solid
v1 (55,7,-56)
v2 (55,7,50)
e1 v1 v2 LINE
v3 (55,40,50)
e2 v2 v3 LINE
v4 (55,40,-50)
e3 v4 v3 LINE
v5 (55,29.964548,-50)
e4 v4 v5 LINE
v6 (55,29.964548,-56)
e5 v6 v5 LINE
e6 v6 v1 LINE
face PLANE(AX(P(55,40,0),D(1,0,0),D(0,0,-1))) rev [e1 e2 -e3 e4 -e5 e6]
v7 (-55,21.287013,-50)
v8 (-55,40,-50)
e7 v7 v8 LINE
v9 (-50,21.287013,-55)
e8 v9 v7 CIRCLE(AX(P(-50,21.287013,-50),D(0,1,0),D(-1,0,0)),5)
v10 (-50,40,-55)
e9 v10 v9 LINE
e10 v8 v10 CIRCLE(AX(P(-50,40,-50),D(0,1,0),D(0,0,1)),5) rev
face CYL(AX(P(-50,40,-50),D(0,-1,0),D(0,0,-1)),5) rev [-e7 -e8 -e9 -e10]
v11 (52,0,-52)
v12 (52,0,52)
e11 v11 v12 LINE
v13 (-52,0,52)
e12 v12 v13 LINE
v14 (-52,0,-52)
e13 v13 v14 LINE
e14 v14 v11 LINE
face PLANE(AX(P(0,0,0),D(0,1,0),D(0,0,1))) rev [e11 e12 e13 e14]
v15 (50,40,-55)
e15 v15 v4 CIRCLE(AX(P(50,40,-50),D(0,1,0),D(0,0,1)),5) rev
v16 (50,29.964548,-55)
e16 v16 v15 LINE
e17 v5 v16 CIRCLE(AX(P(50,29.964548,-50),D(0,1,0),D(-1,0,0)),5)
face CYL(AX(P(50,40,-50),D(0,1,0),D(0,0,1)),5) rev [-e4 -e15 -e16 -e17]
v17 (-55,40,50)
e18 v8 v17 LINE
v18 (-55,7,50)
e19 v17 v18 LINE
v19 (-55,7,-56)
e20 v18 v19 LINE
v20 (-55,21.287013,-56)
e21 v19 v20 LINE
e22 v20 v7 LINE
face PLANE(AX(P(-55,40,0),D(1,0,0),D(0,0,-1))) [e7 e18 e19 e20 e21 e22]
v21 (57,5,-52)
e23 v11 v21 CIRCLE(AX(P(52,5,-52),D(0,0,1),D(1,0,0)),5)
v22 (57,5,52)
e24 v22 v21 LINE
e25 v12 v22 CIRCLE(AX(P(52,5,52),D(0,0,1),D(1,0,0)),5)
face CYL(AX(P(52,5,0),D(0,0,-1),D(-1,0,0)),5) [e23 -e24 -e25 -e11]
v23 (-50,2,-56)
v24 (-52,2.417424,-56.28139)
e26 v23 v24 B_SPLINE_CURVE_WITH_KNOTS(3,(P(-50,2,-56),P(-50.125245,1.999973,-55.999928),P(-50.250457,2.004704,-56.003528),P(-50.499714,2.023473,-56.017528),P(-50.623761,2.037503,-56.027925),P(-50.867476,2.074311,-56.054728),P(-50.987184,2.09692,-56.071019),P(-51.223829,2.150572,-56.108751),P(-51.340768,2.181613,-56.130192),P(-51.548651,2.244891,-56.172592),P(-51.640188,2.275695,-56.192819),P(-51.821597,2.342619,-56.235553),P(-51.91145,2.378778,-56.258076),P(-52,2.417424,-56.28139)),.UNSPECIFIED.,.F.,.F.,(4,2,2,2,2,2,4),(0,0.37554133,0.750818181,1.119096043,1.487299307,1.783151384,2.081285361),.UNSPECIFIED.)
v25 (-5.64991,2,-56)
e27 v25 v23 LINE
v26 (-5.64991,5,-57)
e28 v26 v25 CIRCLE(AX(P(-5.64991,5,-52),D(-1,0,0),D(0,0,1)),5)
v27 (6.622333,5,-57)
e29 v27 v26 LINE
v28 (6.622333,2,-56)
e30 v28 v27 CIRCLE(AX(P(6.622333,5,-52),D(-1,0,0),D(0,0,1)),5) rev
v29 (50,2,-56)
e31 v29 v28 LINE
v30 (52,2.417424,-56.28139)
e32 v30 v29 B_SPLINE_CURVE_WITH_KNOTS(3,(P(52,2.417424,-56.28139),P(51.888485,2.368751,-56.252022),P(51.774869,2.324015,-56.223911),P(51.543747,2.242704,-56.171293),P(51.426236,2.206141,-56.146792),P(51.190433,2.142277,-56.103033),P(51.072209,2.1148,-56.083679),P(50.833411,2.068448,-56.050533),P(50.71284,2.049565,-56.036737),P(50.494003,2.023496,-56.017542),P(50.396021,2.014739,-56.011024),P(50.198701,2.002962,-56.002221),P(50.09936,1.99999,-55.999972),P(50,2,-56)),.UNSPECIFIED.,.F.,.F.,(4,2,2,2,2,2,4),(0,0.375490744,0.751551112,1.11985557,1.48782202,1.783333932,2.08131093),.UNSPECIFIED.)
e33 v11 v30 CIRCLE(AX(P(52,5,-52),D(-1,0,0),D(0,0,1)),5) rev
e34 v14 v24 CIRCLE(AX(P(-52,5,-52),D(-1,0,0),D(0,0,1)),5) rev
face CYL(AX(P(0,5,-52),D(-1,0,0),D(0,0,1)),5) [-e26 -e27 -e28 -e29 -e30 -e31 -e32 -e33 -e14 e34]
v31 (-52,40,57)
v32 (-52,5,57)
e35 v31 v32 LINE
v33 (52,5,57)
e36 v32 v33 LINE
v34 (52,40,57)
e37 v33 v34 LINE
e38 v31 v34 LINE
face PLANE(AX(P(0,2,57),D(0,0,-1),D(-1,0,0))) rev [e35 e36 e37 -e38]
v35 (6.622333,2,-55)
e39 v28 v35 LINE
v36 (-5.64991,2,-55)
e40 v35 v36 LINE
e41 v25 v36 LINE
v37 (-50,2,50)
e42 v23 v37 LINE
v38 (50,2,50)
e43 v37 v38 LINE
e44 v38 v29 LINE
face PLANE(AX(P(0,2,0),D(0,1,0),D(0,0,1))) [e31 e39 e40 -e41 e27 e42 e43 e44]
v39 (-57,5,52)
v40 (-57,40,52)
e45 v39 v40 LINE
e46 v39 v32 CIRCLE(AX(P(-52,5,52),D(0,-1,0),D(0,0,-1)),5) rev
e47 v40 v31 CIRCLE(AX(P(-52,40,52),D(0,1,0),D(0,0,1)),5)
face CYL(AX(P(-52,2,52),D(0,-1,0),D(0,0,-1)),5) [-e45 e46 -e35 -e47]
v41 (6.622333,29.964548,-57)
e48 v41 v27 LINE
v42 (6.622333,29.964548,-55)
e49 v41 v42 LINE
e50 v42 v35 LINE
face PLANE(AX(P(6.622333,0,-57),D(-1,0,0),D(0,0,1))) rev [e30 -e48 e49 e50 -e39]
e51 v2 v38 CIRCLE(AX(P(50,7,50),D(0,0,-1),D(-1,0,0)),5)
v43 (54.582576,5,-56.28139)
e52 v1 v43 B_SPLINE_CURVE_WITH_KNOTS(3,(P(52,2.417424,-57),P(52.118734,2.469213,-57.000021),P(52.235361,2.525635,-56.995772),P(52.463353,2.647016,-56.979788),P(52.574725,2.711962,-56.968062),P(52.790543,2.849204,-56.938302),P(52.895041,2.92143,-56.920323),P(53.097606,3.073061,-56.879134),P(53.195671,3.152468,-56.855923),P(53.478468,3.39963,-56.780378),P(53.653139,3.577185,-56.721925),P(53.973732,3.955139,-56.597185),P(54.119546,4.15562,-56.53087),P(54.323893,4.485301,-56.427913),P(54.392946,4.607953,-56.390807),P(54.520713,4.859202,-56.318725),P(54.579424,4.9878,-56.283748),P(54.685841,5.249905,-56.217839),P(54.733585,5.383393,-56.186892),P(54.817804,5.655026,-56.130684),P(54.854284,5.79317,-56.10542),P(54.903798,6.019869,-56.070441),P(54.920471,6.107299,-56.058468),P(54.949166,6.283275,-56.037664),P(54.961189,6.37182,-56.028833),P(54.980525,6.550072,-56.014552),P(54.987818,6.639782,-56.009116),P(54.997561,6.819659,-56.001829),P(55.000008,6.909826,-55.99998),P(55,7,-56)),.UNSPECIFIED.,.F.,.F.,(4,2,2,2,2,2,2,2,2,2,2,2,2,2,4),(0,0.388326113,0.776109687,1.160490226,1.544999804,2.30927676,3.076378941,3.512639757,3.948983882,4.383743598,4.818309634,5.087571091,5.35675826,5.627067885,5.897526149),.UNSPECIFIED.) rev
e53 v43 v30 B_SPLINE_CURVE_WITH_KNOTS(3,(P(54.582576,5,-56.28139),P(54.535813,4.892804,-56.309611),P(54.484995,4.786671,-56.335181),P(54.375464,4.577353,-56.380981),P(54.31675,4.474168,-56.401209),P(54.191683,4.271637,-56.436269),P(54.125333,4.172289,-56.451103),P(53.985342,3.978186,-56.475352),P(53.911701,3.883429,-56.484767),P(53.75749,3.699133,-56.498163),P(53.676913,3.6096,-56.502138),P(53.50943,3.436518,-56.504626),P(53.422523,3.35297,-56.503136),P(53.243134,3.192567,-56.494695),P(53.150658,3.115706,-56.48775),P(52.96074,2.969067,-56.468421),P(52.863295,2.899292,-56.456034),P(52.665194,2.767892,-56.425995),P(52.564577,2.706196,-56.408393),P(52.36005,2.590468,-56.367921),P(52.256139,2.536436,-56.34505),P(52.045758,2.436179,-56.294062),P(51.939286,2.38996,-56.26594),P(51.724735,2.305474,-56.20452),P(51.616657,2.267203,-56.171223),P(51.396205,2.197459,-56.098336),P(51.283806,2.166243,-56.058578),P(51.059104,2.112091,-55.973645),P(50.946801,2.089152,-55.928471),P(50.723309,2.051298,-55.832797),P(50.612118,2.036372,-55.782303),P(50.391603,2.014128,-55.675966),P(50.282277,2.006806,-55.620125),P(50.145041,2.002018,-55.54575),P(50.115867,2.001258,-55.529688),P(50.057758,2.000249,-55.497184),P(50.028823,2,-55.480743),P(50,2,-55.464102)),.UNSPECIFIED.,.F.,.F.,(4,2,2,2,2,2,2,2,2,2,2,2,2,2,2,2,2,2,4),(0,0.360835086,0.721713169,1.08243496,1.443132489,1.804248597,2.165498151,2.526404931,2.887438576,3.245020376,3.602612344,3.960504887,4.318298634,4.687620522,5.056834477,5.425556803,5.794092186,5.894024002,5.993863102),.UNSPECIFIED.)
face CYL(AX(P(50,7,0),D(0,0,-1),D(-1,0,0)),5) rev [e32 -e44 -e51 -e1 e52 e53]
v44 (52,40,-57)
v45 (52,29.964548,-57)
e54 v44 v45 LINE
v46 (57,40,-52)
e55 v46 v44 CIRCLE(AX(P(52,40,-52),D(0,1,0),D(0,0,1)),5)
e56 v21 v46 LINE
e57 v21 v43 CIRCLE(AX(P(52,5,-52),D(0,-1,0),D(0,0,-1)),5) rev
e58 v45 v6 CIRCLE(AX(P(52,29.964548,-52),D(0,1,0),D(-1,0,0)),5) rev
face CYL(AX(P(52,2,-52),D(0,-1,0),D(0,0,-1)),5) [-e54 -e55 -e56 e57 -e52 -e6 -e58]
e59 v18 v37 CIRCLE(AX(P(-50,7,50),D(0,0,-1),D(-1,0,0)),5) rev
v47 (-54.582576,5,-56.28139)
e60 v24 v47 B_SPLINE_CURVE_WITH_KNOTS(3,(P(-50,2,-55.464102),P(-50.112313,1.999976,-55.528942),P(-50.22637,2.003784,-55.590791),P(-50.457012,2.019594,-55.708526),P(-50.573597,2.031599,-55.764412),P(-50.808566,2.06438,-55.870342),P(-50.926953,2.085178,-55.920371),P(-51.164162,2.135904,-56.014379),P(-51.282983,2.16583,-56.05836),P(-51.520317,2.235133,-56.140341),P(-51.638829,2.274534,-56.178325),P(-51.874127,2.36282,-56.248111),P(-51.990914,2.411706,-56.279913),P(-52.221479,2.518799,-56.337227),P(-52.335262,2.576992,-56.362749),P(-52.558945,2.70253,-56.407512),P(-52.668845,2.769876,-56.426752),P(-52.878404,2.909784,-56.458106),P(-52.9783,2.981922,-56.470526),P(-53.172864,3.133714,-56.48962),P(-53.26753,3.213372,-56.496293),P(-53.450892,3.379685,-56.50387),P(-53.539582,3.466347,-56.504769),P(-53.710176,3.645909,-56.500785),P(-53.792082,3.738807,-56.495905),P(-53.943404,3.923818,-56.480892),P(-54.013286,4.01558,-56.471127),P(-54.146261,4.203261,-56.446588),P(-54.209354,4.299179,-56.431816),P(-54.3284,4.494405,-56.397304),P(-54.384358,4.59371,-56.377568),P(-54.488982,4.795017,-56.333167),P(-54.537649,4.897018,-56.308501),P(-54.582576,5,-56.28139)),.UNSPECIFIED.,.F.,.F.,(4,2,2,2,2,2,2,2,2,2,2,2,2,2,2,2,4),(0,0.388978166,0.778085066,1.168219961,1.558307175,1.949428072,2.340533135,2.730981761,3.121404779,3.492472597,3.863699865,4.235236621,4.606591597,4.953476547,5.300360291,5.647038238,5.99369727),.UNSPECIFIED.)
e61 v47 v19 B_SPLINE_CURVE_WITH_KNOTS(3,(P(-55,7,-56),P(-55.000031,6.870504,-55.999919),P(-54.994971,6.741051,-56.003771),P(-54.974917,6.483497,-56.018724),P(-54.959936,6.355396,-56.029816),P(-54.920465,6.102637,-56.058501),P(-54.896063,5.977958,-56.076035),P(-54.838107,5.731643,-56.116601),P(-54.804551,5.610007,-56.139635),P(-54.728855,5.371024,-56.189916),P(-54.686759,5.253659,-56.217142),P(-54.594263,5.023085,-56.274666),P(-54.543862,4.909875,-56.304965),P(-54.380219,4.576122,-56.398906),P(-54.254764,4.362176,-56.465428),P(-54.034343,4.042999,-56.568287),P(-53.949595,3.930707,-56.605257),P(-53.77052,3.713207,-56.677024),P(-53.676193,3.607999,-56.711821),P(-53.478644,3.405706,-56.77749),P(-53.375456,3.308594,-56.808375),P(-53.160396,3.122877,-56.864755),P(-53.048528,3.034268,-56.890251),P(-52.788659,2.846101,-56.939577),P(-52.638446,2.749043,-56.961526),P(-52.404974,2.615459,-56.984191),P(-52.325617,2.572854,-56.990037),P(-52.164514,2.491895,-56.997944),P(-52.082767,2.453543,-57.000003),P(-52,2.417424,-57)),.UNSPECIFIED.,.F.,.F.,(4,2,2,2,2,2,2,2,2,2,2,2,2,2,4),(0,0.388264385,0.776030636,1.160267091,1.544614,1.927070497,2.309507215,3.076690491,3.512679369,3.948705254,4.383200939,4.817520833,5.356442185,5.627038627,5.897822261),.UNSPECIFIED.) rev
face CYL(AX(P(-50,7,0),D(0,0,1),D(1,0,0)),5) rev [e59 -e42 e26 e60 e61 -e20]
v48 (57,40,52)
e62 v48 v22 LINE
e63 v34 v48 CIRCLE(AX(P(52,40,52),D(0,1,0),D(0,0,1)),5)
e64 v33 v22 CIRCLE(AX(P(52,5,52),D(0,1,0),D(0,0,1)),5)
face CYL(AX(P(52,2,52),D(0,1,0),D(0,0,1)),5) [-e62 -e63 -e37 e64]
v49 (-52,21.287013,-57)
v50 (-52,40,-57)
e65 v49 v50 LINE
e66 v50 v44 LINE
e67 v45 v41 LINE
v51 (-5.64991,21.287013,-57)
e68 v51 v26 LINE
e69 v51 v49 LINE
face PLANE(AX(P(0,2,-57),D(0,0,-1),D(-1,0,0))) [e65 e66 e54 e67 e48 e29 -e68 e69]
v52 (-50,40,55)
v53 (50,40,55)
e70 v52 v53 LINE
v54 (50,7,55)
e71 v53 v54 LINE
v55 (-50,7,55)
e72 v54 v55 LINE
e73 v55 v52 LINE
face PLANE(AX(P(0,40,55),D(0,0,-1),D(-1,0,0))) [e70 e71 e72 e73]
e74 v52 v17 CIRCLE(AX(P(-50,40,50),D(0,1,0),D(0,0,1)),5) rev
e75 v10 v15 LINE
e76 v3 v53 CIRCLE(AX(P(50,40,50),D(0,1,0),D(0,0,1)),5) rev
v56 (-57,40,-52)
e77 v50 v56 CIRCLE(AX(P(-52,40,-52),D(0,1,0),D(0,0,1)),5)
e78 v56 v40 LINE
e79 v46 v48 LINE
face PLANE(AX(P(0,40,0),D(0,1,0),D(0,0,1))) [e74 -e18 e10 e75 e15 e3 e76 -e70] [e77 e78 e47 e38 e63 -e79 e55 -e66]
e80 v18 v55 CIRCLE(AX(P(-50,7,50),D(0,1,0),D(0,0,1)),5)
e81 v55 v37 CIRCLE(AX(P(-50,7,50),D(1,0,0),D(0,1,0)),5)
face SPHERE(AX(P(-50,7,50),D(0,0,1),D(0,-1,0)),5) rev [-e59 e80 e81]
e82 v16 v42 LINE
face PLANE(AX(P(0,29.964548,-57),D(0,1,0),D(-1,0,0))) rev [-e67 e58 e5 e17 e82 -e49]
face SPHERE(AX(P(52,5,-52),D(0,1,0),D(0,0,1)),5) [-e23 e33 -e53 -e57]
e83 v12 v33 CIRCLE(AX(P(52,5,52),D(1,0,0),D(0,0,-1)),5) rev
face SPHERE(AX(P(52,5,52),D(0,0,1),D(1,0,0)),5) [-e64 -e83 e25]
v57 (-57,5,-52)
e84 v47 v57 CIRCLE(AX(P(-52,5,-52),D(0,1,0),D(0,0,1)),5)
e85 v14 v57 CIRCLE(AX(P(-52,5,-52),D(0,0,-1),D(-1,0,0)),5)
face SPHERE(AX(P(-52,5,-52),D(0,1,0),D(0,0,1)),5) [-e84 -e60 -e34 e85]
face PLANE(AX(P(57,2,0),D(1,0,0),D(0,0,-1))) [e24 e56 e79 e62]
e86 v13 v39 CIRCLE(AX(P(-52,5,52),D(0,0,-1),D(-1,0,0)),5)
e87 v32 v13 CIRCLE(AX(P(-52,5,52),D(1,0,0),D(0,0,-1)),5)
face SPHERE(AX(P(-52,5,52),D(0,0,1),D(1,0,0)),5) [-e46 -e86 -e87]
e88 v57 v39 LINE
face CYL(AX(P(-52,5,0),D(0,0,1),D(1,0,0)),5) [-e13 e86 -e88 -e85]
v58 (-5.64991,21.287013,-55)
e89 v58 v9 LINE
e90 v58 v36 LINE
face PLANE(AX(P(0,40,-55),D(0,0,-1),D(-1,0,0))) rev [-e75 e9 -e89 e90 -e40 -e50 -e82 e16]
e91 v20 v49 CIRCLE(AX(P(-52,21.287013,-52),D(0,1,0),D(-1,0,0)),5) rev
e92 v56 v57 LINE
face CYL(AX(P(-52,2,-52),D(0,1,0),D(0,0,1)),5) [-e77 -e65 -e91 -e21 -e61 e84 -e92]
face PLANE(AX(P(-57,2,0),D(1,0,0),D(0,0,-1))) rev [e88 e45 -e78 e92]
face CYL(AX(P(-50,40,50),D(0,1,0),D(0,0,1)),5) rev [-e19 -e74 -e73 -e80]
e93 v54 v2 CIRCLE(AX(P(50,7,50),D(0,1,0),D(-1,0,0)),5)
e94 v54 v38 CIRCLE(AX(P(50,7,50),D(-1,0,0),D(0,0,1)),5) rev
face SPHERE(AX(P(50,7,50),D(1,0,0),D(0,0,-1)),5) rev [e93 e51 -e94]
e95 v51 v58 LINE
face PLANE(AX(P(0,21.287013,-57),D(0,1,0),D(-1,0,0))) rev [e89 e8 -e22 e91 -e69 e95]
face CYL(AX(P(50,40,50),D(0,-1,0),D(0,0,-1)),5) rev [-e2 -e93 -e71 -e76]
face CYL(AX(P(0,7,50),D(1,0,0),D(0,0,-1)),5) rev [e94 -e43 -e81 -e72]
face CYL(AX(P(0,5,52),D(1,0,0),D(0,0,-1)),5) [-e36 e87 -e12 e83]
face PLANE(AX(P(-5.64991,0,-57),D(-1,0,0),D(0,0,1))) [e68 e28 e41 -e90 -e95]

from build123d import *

# Parameters (mm, degrees)
SKETCH1_W           = 114
SKETCH1_H           = 114
SKETCH1_W_2         = 110
SKETCH1_H_2         = 110
BOSS_EXTRUDE1_DEPTH = 2
SKETCH1_3_W         = 114
SKETCH1_3_H         = 114
SKETCH1_3_W_2       = 110
SKETCH1_3_H_2       = 110
BOSS_EXTRUDE2_DEPTH = 40
SKETCH2_W           = 48.37766652
SKETCH2_H           = 27.964547649
SKETCH2_W_2         = 49.350090125
SKETCH2_H_2         = 19.287013153
CUT_EXTRUDE1_DEPTH  = 132.882523482
FILLET1_R           = 5
FILLET2_R           = 5


with BuildPart() as part:
    # Sketch1 → Boss-Extrude1 (new body)
    # profile 1 of 2: a face of its own
    with BuildSketch(Plane(origin=(0, 0, 0), x_dir=(1, 0, 0), z_dir=(0, 1, 0))):
        Rectangle(SKETCH1_W, SKETCH1_H)
        Rectangle(SKETCH1_W_2, SKETCH1_H_2, mode=Mode.SUBTRACT)
    # profile 2 of 2: a face of its own
    with BuildSketch(Plane(origin=(0, 0, 0), x_dir=(1, 0, 0), z_dir=(0, 1, 0))):
        Rectangle(SKETCH1_W_2, SKETCH1_H_2)
    extrude(amount=BOSS_EXTRUDE1_DEPTH)

    # Sketch1<3> → Boss-Extrude2 (add)
    with BuildSketch(Plane(origin=(0, 0, 0), x_dir=(1, 0, 0), z_dir=(0, 1, 0))):
        Rectangle(SKETCH1_3_W, SKETCH1_3_H)
        Rectangle(SKETCH1_3_W_2, SKETCH1_3_H_2, mode=Mode.SUBTRACT)
    extrude(amount=BOSS_EXTRUDE2_DEPTH)

    # Sketch2 → Cut-Extrude1 (cut, through all)
    with BuildSketch(Plane.XY.offset(-55)):
        with Locations((30.81116674, 15.982273825)):
            Rectangle(SKETCH2_W, SKETCH2_H)
        with Locations((-30.324954937, 11.643506577)):
            Rectangle(SKETCH2_W_2, SKETCH2_H_2)
    extrude(amount=-CUT_EXTRUDE1_DEPTH, mode=Mode.SUBTRACT)

    # Fillet1
    # the kernel refuses this fillet: 5 mm, written as the material it adds along each edge
    with BuildSketch(Plane(origin=(50, 7, 50), x_dir=(0, 0, 1), z_dir=(0, -1, 0))) as fillet1_piece_1_section:
        Polygon((0, 0), (FILLET1_R, 0), (FILLET1_R, -FILLET1_R), (0, -FILLET1_R), align=None)
    fillet1_piece_1 = extrude(amount=FILLET1_R, mode=Mode.PRIVATE)
    fillet1_piece_1 = fillet1_piece_1 - Plane(origin=(50, 7, 50), x_dir=(-0.7071067811865477, 0, -0.7071067811865475), z_dir=(0, -1, 0)) * Sphere(FILLET1_R, mode=Mode.PRIVATE)
    add(fillet1_piece_1)
    with BuildSketch(Plane(origin=(-50, 7, 50), x_dir=(-1, 0, 0), z_dir=(0, -1, 0))) as fillet1_piece_2_section:
        Polygon((0, 0), (FILLET1_R, 0), (FILLET1_R, -FILLET1_R), (0, -FILLET1_R), align=None)
    fillet1_piece_2 = extrude(amount=FILLET1_R, mode=Mode.PRIVATE)
    fillet1_piece_2 = fillet1_piece_2 - Plane(origin=(-50, 7, 50), x_dir=(0.7071067811865475, 0, -0.7071067811865476), z_dir=(0, -1, 0)) * Sphere(FILLET1_R, mode=Mode.PRIVATE)
    add(fillet1_piece_2)
    with BuildSketch(Plane(origin=(55, 2, 50), x_dir=(0, 1, 0), z_dir=(0, 0, -1)), Plane(origin=(-55, 2, -57), x_dir=(0, 1, 0), z_dir=(0, 0, 1))) as fillet1_piece_3:
        with BuildLine():
            CenterArc((FILLET1_R, -FILLET1_R), FILLET1_R, 90, 90)
            Line((0, -FILLET1_R), (0, 0))
            Line((0, 0), (FILLET1_R, 0))
        make_face()
    extrude(amount=107)
    with BuildSketch(Plane(origin=(50, 2, 55), x_dir=(0, 1, 0), z_dir=(-1, 0, 0))) as fillet1_piece_4:
        with BuildLine():
            CenterArc((FILLET1_R, FILLET1_R), FILLET1_R, 180, 90)
            Line((0, FILLET1_R), (0, 0))
            Line((0, 0), (FILLET1_R, 0))
        make_face()
    extrude(amount=100)
    with BuildSketch(Plane(origin=(-55, 7, 55), x_dir=(0, 0, -1), z_dir=(0, 1, 0)), Plane(origin=(55, 7, 55), x_dir=(-1, 0, 0), z_dir=(0, 1, 0))) as fillet1_piece_5:
        with BuildLine():
            CenterArc((FILLET1_R, -FILLET1_R), FILLET1_R, 90, 90)
            Line((0, -FILLET1_R), (0, 0))
            Line((0, 0), (FILLET1_R, 0))
        make_face()
    extrude(amount=33)
    with BuildSketch(Plane(origin=(55, 29.964547649, -55), x_dir=(-1, 0, 0), z_dir=(0, 1, 0))) as fillet1_piece_6:
        with BuildLine():
            CenterArc((FILLET1_R, FILLET1_R), FILLET1_R, 180, 90)
            Line((0, FILLET1_R), (0, 0))
            Line((0, 0), (FILLET1_R, 0))
        make_face()
    extrude(amount=10.035452351)
    with BuildSketch(Plane(origin=(-55, 21.287013153, -55), x_dir=(1, 0, 0), z_dir=(0, 1, 0))) as fillet1_piece_7:
        with BuildLine():
            CenterArc((FILLET1_R, -FILLET1_R), FILLET1_R, 90, 90)
            Line((0, -FILLET1_R), (0, 0))
            Line((0, 0), (FILLET1_R, 0))
        make_face()
    extrude(amount=18.712986847)
    # the kernel refuses this fillet: 5 mm, written as the material it takes off along each edge
    with BuildSketch(Plane(origin=(69.5, 0, 57), x_dir=(0, 0, -1), z_dir=(-1, 0, 0))) as fillet1_2_piece_1:
        with BuildLine():
            CenterArc((FILLET1_R, -FILLET1_R), FILLET1_R, 90, 90)
            Line((0, -FILLET1_R), (0, 0))
            Line((0, 0), (FILLET1_R, 0))
        make_face()
    extrude(amount=139, mode=Mode.SUBTRACT)
    with BuildSketch(Plane(origin=(-57, -12.5, 57), x_dir=(1, 0, 0), z_dir=(0, 1, 0)), Plane(origin=(57, 52.5, 57), x_dir=(-1, 0, 0), z_dir=(0, -1, 0))) as fillet1_2_piece_2:
        with BuildLine():
            CenterArc((FILLET1_R, FILLET1_R), FILLET1_R, 180, 90)
            Line((0, FILLET1_R), (0, 0))
            Line((0, 0), (FILLET1_R, 0))
        make_face()
    extrude(amount=65, mode=Mode.SUBTRACT)
    with BuildSketch(Plane(origin=(57, 52.5, -57), x_dir=(-1, 0, 0), z_dir=(0, -1, 0)), Plane(origin=(-57, -12.5, -57), x_dir=(1, 0, 0), z_dir=(0, 1, 0))) as fillet1_2_piece_3:
        with BuildLine():
            CenterArc((FILLET1_R, -FILLET1_R), FILLET1_R, 90, 90)
            Line((0, -FILLET1_R), (0, 0))
            Line((0, 0), (FILLET1_R, 0))
        make_face()
    extrude(amount=65, mode=Mode.SUBTRACT)

    # Fillet2
    # the kernel refuses this fillet: 5 mm, written as the material it takes off along each edge
    with BuildSketch(Plane(origin=(52, 5, 52), x_dir=(0, -1, 0), z_dir=(1, 0, 0))) as fillet2_piece_1_section:
        Polygon((0, 0), (FILLET2_R, 0), (FILLET2_R, -FILLET2_R), (0, -FILLET2_R), align=None)
    fillet2_piece_1 = extrude(amount=FILLET2_R, mode=Mode.PRIVATE)
    fillet2_piece_1 = fillet2_piece_1 - Plane(origin=(52, 5, 52), x_dir=(0, 0.7071067811865475, -0.7071067811865475), z_dir=(1, 0, 0)) * Sphere(FILLET2_R, mode=Mode.PRIVATE)
    add(fillet2_piece_1, mode=Mode.SUBTRACT)
    with BuildSketch(Plane(origin=(-52, 5, 52), x_dir=(0, -1, 0), z_dir=(-1, 0, 0))) as fillet2_piece_2_section:
        Polygon((0, 0), (FILLET2_R, 0), (FILLET2_R, FILLET2_R), (0, FILLET2_R), align=None)
    fillet2_piece_2 = extrude(amount=FILLET2_R, mode=Mode.PRIVATE)
    fillet2_piece_2 = fillet2_piece_2 - Plane(origin=(-52, 5, 52), x_dir=(0, 0.7071067811865475, -0.7071067811865475), z_dir=(-1, 0, 0)) * Sphere(FILLET2_R, mode=Mode.PRIVATE)
    add(fillet2_piece_2, mode=Mode.SUBTRACT)
    with BuildSketch(Plane(origin=(57, 0, -52), x_dir=(0, 1, 0), z_dir=(0, 0, 1)), Plane(origin=(-52, 0, -57), x_dir=(0, 1, 0), z_dir=(1, 0, 0)), Plane(origin=(-57, 0, 52), x_dir=(0, 1, 0), z_dir=(0, 0, -1))) as fillet2_piece_3:
        with BuildLine():
            CenterArc((FILLET2_R, FILLET2_R), FILLET2_R, 180, 90)
            Line((0, FILLET2_R), (0, 0))
            Line((0, 0), (FILLET2_R, 0))
        make_face()
    extrude(amount=104, mode=Mode.SUBTRACT)
    with BuildSketch(Plane(origin=(52, 0, -52), x_dir=(1, 0, 0), z_dir=(0, 0, 1))) as fillet2_piece_4:
        with BuildLine():
            CenterArc((5 - FILLET2_R, FILLET2_R), FILLET2_R, 270, 90)
            Line((5 - FILLET2_R, 0), (5, 0))
            Line((5, 0), (5, FILLET2_R))
        make_face()
    revolve(axis=Axis((52, 0, -52), (0, 1, 0)), revolution_arc=90, mode=Mode.SUBTRACT)
    with BuildSketch(Plane(origin=(-52, 0, -52), x_dir=(-1, 0, 0), z_dir=(0, 0, 1))) as fillet2_piece_5:
        with BuildLine():
            CenterArc((5 - FILLET2_R, -FILLET2_R), FILLET2_R, 0, 90)
            Line((5 - FILLET2_R, 0), (5, 0))
            Line((5, 0), (5, -FILLET2_R))
        make_face()
    revolve(axis=Axis((-52, 0, -52), (0, -1, 0)), revolution_arc=90, mode=Mode.SUBTRACT)


solid = part.part
